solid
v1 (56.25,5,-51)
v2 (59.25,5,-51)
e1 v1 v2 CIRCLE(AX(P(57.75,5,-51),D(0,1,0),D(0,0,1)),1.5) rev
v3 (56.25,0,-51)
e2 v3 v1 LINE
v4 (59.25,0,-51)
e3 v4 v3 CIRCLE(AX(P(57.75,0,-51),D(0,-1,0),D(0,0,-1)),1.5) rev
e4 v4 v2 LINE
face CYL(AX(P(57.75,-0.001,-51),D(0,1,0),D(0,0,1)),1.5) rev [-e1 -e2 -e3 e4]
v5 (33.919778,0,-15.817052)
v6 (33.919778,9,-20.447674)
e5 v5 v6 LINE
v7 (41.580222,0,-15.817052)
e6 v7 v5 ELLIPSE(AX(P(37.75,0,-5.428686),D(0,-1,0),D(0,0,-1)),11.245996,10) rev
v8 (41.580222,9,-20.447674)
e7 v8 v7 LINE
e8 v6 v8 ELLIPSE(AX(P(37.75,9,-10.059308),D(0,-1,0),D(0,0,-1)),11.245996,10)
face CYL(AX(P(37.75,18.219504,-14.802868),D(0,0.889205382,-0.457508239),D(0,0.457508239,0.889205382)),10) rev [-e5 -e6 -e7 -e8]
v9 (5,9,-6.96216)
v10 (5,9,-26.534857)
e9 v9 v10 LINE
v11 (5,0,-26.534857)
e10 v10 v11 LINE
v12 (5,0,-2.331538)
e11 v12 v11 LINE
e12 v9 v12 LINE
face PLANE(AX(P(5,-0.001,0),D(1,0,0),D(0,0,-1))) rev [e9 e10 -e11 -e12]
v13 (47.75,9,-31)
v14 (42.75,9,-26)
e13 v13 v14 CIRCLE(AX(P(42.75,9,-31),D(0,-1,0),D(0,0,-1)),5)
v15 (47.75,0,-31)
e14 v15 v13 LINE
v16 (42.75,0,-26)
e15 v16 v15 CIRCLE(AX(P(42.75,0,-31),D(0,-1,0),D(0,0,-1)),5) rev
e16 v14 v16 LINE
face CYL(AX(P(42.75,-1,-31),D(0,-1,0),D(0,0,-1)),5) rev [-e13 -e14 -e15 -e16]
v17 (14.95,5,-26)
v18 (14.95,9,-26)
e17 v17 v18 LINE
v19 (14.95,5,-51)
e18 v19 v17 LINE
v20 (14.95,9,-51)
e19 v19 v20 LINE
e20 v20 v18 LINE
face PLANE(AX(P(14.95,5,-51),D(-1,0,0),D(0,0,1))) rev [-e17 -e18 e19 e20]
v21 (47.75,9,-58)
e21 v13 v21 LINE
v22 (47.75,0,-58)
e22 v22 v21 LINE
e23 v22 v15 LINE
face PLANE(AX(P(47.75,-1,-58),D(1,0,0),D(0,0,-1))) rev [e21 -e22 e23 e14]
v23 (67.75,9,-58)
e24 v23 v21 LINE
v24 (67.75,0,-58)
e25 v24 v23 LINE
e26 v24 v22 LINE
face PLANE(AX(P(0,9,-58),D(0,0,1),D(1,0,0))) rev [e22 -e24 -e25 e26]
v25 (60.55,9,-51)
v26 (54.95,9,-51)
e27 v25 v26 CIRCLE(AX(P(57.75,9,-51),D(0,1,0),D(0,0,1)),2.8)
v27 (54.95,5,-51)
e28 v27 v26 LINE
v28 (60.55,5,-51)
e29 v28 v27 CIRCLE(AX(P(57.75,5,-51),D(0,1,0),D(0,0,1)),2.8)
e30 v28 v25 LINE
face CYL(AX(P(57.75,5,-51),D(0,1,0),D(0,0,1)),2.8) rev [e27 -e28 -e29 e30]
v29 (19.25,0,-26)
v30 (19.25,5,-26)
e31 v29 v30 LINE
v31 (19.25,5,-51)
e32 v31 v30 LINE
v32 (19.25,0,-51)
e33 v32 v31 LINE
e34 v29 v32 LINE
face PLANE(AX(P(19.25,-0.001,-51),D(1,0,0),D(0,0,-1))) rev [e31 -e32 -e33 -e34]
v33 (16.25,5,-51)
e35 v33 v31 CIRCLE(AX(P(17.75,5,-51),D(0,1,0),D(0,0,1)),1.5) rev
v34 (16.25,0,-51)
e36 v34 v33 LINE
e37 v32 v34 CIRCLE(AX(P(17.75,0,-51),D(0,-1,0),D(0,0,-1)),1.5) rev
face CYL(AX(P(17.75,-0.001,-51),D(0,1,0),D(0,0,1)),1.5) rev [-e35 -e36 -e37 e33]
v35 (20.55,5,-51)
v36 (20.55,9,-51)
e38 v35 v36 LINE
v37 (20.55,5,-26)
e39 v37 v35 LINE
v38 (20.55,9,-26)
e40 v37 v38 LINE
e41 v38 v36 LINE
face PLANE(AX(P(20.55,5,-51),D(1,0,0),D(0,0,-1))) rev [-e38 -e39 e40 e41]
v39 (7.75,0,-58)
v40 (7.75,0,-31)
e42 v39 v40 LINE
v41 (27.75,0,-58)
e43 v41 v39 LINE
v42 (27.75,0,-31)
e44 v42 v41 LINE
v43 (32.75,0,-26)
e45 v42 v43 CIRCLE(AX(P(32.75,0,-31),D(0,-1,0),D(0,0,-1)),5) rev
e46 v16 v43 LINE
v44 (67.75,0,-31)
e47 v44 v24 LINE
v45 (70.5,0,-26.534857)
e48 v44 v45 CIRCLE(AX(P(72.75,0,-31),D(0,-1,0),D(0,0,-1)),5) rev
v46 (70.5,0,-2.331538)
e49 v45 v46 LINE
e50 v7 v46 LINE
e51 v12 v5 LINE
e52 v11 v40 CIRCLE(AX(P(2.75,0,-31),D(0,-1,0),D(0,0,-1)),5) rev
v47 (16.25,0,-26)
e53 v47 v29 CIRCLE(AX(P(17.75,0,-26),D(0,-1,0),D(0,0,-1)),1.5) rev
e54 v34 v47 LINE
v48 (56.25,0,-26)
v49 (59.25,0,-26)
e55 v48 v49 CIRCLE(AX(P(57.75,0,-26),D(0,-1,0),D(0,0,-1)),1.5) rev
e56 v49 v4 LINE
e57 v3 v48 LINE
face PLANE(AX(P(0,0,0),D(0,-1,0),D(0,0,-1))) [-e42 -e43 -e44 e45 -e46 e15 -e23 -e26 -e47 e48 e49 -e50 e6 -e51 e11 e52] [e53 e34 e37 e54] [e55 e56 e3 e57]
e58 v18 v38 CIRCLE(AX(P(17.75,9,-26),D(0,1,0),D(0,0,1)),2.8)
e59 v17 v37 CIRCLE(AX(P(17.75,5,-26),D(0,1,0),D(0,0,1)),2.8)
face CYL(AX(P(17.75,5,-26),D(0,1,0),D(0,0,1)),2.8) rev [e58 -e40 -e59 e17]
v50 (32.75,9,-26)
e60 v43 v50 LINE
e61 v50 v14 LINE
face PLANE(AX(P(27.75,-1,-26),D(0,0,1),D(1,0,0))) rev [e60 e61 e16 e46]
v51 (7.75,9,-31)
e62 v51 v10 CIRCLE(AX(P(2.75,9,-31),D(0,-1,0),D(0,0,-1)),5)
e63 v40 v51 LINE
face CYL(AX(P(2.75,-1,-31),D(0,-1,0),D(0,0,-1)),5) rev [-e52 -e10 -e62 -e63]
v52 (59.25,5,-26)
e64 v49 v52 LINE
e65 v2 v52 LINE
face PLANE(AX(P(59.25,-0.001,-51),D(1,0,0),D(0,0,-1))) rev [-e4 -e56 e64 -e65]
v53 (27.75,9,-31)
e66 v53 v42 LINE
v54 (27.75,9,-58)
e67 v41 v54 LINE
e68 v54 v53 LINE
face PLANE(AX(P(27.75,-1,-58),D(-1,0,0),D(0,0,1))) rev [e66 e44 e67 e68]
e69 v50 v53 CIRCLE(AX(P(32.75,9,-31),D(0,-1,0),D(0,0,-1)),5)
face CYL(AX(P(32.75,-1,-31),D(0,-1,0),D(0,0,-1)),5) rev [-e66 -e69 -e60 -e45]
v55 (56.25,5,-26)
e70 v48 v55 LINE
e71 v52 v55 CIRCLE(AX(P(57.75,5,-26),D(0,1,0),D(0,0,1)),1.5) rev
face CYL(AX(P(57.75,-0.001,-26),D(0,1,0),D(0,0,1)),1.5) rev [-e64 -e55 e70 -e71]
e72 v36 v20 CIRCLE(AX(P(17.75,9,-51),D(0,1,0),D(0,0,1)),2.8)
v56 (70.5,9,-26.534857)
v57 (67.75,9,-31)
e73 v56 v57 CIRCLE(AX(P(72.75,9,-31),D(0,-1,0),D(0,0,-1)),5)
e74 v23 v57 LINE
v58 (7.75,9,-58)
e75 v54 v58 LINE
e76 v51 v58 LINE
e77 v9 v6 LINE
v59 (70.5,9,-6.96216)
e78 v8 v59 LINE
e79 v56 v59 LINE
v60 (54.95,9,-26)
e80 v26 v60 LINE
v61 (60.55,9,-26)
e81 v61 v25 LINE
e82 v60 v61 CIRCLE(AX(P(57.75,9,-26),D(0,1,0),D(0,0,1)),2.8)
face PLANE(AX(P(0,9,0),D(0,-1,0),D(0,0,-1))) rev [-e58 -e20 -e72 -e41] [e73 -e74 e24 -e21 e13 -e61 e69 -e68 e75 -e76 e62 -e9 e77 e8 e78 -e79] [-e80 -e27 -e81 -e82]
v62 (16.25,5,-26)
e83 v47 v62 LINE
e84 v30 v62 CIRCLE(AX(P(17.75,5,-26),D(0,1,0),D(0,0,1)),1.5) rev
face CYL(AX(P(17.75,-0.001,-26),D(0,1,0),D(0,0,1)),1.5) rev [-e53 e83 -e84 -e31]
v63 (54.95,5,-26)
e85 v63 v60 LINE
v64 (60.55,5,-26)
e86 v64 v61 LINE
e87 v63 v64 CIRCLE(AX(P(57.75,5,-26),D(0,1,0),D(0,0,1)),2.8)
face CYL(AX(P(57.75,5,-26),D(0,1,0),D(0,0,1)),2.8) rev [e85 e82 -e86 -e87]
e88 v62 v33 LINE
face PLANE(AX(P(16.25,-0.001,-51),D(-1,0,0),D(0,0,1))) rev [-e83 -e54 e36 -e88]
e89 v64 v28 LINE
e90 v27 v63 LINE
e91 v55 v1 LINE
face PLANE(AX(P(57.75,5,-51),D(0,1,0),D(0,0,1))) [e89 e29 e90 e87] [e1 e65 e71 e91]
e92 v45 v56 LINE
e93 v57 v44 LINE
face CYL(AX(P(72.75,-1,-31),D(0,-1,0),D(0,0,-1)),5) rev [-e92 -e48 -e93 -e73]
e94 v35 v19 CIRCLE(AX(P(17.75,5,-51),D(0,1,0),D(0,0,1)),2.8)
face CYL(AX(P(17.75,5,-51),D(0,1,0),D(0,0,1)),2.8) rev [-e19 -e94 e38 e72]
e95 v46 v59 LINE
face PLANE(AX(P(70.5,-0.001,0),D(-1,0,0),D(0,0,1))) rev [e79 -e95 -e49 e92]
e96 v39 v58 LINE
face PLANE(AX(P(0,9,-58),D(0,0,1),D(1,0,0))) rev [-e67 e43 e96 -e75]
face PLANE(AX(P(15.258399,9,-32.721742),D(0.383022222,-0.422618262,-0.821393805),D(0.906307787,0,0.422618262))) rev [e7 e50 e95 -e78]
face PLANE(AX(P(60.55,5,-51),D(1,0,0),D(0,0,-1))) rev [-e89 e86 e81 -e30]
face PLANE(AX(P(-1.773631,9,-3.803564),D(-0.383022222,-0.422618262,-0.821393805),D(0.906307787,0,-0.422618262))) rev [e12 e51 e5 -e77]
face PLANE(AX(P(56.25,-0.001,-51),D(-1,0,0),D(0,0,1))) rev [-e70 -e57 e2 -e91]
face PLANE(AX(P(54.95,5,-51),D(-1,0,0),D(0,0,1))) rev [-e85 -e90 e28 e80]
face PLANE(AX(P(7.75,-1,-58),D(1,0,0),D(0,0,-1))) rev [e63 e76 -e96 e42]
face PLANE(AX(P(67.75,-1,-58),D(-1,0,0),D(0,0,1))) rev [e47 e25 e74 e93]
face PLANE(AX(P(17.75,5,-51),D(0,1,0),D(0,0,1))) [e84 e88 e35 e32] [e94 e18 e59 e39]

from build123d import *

# Parameters (mm, degrees)
BOSS_EXTRUDE1_DEPTH = 9
CUT_EXTRUDE2_REACH  = 97.631
SKETCH5_W           = 20
SKETCH5_H           = 32
SKETCH5_W_2         = 7.75
CUT_EXTRUDE3_DEPTH  = 10
FILLET1_R           = 5
CUT_EXTRUDE4_DEPTH  = 4
CHAMFER1_SIZE       = 9
CHAMFER1_SIZE_2     = 4.196768923
FILLET2_R           = 10
CUT_EXTRUDE5_REACH  = 97.631
SKETCH7_W           = 5
SKETCH7_H           = 33.085129134
SKETCH7_H_2         = 33.745309592


with BuildPart() as part:
    # Sketch1 → Boss-Extrude1 (new body)
    with BuildSketch(Plane(origin=(0, 0, 0), x_dir=(1, 0, 0), z_dir=(0, 1, 0))):
        Polygon((0, 0), (0, 58), (75.5, 58), (75.5, 0), (37.75, 17.603114095), align=None)
    extrude(amount=BOSS_EXTRUDE1_DEPTH)

    # Sketch4 → Cut-Extrude2 (cut, up to next)
    with BuildSketch(Plane(origin=(0, 9, 0), x_dir=(1, 0, 0), z_dir=(0, 1, 0)), mode=Mode.PRIVATE) as cut_extrude2_sk1:
        with BuildLine():
            Line((19.25, 51), (19.25, 26))
            ThreePointArc((19.25, 26), (17.75, 24.5), (16.25, 26))
            Line((16.25, 26), (16.25, 51))
            ThreePointArc((16.25, 51), (17.75, 52.5), (19.25, 51))
        make_face()
    cut_extrude2_tool1 = extrude(cut_extrude2_sk1.sketch, amount=-CUT_EXTRUDE2_REACH, mode=Mode.PRIVATE) & part.part
    # Sketch4 → Cut-Extrude2 (cut, up to next)
    with BuildSketch(Plane(origin=(0, 9, 0), x_dir=(1, 0, 0), z_dir=(0, 1, 0)), mode=Mode.PRIVATE) as cut_extrude2_sk2:
        with BuildLine():
            Line((59.25, 51), (59.25, 26))
            ThreePointArc((59.25, 26), (57.75, 24.5), (56.25, 26))
            Line((56.25, 26), (56.25, 51))
            ThreePointArc((56.25, 51), (57.75, 52.5), (59.25, 51))
        make_face()
    cut_extrude2_tool2 = extrude(cut_extrude2_sk2.sketch, amount=-CUT_EXTRUDE2_REACH, mode=Mode.PRIVATE) & part.part
    add(cut_extrude2_tool1.solids().sort_by_distance((17.75, 9, -38.5))[0], mode=Mode.SUBTRACT)
    add(cut_extrude2_tool2.solids().sort_by_distance((57.75, 9, -38.5))[0], mode=Mode.SUBTRACT)

    # Sketch5 → Cut-Extrude3 (cut)
    with BuildSketch(Plane(origin=(0, 9, 0), x_dir=(1, 0, 0), z_dir=(0, 1, 0))):
        with Locations((37.75, 42)):
            Rectangle(SKETCH5_W, SKETCH5_H)
        with Locations((71.625, 42)):
            Rectangle(SKETCH5_W_2, SKETCH5_H)
        with Locations((3.875, 42)):
            Rectangle(SKETCH5_W_2, SKETCH5_H)
    extrude(amount=-CUT_EXTRUDE3_DEPTH, mode=Mode.SUBTRACT)

    # Fillet1
    fillet1_edges = [part.edges().sort_by_distance(p)[0] for p in [
        (27.75, 4.5, -26),
        (47.75, 4.5, -26),
        (7.75, 4.5, -26),
        (67.75, 4.5, -26),
    ]]
    fillet(fillet1_edges, radius=FILLET1_R)

    # Sketch6 → Cut-Extrude4 (cut)
    with BuildSketch(Plane(origin=(0, 9, 0), x_dir=(1, 0, 0), z_dir=(0, 1, 0))):
        with BuildLine():
            Line((20.55, 51), (20.55, 26))
            ThreePointArc((20.55, 26), (17.75, 23.2), (14.95, 26))
            Line((14.95, 26), (14.95, 51))
            ThreePointArc((14.95, 51), (17.75, 53.8), (20.55, 51))
        make_face()
        with BuildLine():
            Line((60.55, 51), (60.55, 26))
            ThreePointArc((60.55, 26), (57.75, 23.2), (54.95, 26))
            Line((54.95, 26), (54.95, 51))
            ThreePointArc((54.95, 51), (57.75, 53.8), (60.55, 51))
        make_face()
    extrude(amount=-CUT_EXTRUDE4_DEPTH, mode=Mode.SUBTRACT)

    # Chamfer1
    # the kernel refuses this chamfer: 9, 4.196768923 mm, written as the material it takes off along each edge
    with BuildSketch(Plane(origin=(96.633991212, 9, 9.85494195), x_dir=(-0.006893395832057369, -0.9998669641130703, 0.014782935067658582), z_dir=(-0.9063077870366479, 0, -0.42261826174070394))) as chamfer1_piece_1_section:
        Polygon((CHAMFER1_SIZE * 0.999866964113, -CHAMFER1_SIZE * 0.0163111641311), (-CHAMFER1_SIZE_2 * 0.0163111641326, -CHAMFER1_SIZE_2 * 0.999866964207), (0, 0), align=None)
    chamfer1_piece_1 = extrude(amount=88.290074926, mode=Mode.PRIVATE)
    chamfer1_piece_1 = split(chamfer1_piece_1, bisect_by=Plane(origin=(57.902621458, 5.937801532, -27.000435813), z_dir=(0.42261826174070394, 0, 0.9063077870366479)), keep=Keep.TOP, mode=Mode.PRIVATE)
    add(chamfer1_piece_1, mode=Mode.SUBTRACT)
    with BuildSketch(Plane(origin=(58.883991212, 9, -27.458056045), x_dir=(0.006893395832057004, -0.9998669641130703, 0.014782935067657803), z_dir=(-0.9063077870366479, 0, 0.42261826174070394))) as chamfer1_piece_2_section:
        Polygon((CHAMFER1_SIZE * 0.999866964113, -CHAMFER1_SIZE * 0.0163111641311), (-CHAMFER1_SIZE_2 * 0.0163111641326, -CHAMFER1_SIZE_2 * 0.999866964207), (0, 0), align=None)
    chamfer1_piece_2 = extrude(amount=88.290074926, mode=Mode.PRIVATE)
    chamfer1_piece_2 = split(chamfer1_piece_2, bisect_by=Plane(origin=(17.597378542, 5.937801532, -27.000435813), z_dir=(-0.42261826174070394, 0, 0.9063077870366479)), keep=Keep.TOP, mode=Mode.PRIVATE)
    add(chamfer1_piece_2, mode=Mode.SUBTRACT)
    with BuildSketch(Plane(origin=(96.633991212, 9, 9.85494195), x_dir=(-0.006893395832057369, -0.9998669641130703, 0.014782935067658582), z_dir=(-0.9063077870366479, 0, -0.42261826174070394))) as chamfer1_piece_3a_section:
        Polygon((CHAMFER1_SIZE * 0.999866964113, -CHAMFER1_SIZE * 0.0163111641311), (-CHAMFER1_SIZE_2 * 0.0163111641326, -CHAMFER1_SIZE_2 * 0.999866964207), (0, 0), align=None)
    chamfer1_piece_3a = extrude(amount=88.290074926, mode=Mode.PRIVATE)
    chamfer1_piece_3a = split(chamfer1_piece_3a, bisect_by=Plane(origin=(32.238129018, 6.0031385, -15.032886446), z_dir=(-0.42261826174070394, 0, -0.9063077870366479)), keep=Keep.TOP, mode=Mode.PRIVATE)
    with BuildSketch(Plane(origin=(58.883991212, 9, -27.458056045), x_dir=(0.006893395832057004, -0.9998669641130703, 0.014782935067657803), z_dir=(-0.9063077870366479, 0, 0.42261826174070394))) as chamfer1_piece_3b_section:
        Polygon((CHAMFER1_SIZE * 0.999866964113, -CHAMFER1_SIZE * 0.0163111641311), (-CHAMFER1_SIZE_2 * 0.0163111641326, -CHAMFER1_SIZE_2 * 0.999866964207), (0, 0), align=None)
    chamfer1_piece_3b = extrude(amount=88.290074926, mode=Mode.PRIVATE)
    chamfer1_piece_3b = split(chamfer1_piece_3b, bisect_by=Plane(origin=(43.261870982, 6.0031385, -15.032886446), z_dir=(0.42261826174070394, 0, -0.9063077870366479)), keep=Keep.TOP, mode=Mode.PRIVATE)
    chamfer1_piece_3 = chamfer1_piece_3a & chamfer1_piece_3b
    add(chamfer1_piece_3, mode=Mode.SUBTRACT)

    # Fillet2
    fillet2_edges = [part.edges().sort_by_distance(p)[0] for p in [
        (37.75, 4.5, -19.918425176),
    ]]
    fillet(fillet2_edges, radius=FILLET2_R)

    # Sketch7 → Cut-Extrude5 (cut, up to next)
    with BuildSketch(Plane(origin=(0, 9, 0), x_dir=(1, 0, 0), z_dir=(0, 1, 0)), mode=Mode.PRIVATE) as cut_extrude5_sk1:
        with Locations((2.5, 16.542564567)):
            Rectangle(SKETCH7_W, SKETCH7_H)
    cut_extrude5_tool1 = extrude(cut_extrude5_sk1.sketch, amount=-CUT_EXTRUDE5_REACH, mode=Mode.PRIVATE) & part.part
    # Sketch7 → Cut-Extrude5 (cut, up to next)
    with BuildSketch(Plane(origin=(0, 9, 0), x_dir=(1, 0, 0), z_dir=(0, 1, 0)), mode=Mode.PRIVATE) as cut_extrude5_sk2:
        with Locations((73, 16.872654796)):
            Rectangle(SKETCH7_W, SKETCH7_H_2)
    cut_extrude5_tool2 = extrude(cut_extrude5_sk2.sketch, amount=-CUT_EXTRUDE5_REACH, mode=Mode.PRIVATE) & part.part
    add(cut_extrude5_tool1.solids().sort_by_distance((2.5, 9, -16.542565))[0], mode=Mode.SUBTRACT)
    add(cut_extrude5_tool2.solids().sort_by_distance((73, 9, -16.872655))[0], mode=Mode.SUBTRACT)


solid = part.part
